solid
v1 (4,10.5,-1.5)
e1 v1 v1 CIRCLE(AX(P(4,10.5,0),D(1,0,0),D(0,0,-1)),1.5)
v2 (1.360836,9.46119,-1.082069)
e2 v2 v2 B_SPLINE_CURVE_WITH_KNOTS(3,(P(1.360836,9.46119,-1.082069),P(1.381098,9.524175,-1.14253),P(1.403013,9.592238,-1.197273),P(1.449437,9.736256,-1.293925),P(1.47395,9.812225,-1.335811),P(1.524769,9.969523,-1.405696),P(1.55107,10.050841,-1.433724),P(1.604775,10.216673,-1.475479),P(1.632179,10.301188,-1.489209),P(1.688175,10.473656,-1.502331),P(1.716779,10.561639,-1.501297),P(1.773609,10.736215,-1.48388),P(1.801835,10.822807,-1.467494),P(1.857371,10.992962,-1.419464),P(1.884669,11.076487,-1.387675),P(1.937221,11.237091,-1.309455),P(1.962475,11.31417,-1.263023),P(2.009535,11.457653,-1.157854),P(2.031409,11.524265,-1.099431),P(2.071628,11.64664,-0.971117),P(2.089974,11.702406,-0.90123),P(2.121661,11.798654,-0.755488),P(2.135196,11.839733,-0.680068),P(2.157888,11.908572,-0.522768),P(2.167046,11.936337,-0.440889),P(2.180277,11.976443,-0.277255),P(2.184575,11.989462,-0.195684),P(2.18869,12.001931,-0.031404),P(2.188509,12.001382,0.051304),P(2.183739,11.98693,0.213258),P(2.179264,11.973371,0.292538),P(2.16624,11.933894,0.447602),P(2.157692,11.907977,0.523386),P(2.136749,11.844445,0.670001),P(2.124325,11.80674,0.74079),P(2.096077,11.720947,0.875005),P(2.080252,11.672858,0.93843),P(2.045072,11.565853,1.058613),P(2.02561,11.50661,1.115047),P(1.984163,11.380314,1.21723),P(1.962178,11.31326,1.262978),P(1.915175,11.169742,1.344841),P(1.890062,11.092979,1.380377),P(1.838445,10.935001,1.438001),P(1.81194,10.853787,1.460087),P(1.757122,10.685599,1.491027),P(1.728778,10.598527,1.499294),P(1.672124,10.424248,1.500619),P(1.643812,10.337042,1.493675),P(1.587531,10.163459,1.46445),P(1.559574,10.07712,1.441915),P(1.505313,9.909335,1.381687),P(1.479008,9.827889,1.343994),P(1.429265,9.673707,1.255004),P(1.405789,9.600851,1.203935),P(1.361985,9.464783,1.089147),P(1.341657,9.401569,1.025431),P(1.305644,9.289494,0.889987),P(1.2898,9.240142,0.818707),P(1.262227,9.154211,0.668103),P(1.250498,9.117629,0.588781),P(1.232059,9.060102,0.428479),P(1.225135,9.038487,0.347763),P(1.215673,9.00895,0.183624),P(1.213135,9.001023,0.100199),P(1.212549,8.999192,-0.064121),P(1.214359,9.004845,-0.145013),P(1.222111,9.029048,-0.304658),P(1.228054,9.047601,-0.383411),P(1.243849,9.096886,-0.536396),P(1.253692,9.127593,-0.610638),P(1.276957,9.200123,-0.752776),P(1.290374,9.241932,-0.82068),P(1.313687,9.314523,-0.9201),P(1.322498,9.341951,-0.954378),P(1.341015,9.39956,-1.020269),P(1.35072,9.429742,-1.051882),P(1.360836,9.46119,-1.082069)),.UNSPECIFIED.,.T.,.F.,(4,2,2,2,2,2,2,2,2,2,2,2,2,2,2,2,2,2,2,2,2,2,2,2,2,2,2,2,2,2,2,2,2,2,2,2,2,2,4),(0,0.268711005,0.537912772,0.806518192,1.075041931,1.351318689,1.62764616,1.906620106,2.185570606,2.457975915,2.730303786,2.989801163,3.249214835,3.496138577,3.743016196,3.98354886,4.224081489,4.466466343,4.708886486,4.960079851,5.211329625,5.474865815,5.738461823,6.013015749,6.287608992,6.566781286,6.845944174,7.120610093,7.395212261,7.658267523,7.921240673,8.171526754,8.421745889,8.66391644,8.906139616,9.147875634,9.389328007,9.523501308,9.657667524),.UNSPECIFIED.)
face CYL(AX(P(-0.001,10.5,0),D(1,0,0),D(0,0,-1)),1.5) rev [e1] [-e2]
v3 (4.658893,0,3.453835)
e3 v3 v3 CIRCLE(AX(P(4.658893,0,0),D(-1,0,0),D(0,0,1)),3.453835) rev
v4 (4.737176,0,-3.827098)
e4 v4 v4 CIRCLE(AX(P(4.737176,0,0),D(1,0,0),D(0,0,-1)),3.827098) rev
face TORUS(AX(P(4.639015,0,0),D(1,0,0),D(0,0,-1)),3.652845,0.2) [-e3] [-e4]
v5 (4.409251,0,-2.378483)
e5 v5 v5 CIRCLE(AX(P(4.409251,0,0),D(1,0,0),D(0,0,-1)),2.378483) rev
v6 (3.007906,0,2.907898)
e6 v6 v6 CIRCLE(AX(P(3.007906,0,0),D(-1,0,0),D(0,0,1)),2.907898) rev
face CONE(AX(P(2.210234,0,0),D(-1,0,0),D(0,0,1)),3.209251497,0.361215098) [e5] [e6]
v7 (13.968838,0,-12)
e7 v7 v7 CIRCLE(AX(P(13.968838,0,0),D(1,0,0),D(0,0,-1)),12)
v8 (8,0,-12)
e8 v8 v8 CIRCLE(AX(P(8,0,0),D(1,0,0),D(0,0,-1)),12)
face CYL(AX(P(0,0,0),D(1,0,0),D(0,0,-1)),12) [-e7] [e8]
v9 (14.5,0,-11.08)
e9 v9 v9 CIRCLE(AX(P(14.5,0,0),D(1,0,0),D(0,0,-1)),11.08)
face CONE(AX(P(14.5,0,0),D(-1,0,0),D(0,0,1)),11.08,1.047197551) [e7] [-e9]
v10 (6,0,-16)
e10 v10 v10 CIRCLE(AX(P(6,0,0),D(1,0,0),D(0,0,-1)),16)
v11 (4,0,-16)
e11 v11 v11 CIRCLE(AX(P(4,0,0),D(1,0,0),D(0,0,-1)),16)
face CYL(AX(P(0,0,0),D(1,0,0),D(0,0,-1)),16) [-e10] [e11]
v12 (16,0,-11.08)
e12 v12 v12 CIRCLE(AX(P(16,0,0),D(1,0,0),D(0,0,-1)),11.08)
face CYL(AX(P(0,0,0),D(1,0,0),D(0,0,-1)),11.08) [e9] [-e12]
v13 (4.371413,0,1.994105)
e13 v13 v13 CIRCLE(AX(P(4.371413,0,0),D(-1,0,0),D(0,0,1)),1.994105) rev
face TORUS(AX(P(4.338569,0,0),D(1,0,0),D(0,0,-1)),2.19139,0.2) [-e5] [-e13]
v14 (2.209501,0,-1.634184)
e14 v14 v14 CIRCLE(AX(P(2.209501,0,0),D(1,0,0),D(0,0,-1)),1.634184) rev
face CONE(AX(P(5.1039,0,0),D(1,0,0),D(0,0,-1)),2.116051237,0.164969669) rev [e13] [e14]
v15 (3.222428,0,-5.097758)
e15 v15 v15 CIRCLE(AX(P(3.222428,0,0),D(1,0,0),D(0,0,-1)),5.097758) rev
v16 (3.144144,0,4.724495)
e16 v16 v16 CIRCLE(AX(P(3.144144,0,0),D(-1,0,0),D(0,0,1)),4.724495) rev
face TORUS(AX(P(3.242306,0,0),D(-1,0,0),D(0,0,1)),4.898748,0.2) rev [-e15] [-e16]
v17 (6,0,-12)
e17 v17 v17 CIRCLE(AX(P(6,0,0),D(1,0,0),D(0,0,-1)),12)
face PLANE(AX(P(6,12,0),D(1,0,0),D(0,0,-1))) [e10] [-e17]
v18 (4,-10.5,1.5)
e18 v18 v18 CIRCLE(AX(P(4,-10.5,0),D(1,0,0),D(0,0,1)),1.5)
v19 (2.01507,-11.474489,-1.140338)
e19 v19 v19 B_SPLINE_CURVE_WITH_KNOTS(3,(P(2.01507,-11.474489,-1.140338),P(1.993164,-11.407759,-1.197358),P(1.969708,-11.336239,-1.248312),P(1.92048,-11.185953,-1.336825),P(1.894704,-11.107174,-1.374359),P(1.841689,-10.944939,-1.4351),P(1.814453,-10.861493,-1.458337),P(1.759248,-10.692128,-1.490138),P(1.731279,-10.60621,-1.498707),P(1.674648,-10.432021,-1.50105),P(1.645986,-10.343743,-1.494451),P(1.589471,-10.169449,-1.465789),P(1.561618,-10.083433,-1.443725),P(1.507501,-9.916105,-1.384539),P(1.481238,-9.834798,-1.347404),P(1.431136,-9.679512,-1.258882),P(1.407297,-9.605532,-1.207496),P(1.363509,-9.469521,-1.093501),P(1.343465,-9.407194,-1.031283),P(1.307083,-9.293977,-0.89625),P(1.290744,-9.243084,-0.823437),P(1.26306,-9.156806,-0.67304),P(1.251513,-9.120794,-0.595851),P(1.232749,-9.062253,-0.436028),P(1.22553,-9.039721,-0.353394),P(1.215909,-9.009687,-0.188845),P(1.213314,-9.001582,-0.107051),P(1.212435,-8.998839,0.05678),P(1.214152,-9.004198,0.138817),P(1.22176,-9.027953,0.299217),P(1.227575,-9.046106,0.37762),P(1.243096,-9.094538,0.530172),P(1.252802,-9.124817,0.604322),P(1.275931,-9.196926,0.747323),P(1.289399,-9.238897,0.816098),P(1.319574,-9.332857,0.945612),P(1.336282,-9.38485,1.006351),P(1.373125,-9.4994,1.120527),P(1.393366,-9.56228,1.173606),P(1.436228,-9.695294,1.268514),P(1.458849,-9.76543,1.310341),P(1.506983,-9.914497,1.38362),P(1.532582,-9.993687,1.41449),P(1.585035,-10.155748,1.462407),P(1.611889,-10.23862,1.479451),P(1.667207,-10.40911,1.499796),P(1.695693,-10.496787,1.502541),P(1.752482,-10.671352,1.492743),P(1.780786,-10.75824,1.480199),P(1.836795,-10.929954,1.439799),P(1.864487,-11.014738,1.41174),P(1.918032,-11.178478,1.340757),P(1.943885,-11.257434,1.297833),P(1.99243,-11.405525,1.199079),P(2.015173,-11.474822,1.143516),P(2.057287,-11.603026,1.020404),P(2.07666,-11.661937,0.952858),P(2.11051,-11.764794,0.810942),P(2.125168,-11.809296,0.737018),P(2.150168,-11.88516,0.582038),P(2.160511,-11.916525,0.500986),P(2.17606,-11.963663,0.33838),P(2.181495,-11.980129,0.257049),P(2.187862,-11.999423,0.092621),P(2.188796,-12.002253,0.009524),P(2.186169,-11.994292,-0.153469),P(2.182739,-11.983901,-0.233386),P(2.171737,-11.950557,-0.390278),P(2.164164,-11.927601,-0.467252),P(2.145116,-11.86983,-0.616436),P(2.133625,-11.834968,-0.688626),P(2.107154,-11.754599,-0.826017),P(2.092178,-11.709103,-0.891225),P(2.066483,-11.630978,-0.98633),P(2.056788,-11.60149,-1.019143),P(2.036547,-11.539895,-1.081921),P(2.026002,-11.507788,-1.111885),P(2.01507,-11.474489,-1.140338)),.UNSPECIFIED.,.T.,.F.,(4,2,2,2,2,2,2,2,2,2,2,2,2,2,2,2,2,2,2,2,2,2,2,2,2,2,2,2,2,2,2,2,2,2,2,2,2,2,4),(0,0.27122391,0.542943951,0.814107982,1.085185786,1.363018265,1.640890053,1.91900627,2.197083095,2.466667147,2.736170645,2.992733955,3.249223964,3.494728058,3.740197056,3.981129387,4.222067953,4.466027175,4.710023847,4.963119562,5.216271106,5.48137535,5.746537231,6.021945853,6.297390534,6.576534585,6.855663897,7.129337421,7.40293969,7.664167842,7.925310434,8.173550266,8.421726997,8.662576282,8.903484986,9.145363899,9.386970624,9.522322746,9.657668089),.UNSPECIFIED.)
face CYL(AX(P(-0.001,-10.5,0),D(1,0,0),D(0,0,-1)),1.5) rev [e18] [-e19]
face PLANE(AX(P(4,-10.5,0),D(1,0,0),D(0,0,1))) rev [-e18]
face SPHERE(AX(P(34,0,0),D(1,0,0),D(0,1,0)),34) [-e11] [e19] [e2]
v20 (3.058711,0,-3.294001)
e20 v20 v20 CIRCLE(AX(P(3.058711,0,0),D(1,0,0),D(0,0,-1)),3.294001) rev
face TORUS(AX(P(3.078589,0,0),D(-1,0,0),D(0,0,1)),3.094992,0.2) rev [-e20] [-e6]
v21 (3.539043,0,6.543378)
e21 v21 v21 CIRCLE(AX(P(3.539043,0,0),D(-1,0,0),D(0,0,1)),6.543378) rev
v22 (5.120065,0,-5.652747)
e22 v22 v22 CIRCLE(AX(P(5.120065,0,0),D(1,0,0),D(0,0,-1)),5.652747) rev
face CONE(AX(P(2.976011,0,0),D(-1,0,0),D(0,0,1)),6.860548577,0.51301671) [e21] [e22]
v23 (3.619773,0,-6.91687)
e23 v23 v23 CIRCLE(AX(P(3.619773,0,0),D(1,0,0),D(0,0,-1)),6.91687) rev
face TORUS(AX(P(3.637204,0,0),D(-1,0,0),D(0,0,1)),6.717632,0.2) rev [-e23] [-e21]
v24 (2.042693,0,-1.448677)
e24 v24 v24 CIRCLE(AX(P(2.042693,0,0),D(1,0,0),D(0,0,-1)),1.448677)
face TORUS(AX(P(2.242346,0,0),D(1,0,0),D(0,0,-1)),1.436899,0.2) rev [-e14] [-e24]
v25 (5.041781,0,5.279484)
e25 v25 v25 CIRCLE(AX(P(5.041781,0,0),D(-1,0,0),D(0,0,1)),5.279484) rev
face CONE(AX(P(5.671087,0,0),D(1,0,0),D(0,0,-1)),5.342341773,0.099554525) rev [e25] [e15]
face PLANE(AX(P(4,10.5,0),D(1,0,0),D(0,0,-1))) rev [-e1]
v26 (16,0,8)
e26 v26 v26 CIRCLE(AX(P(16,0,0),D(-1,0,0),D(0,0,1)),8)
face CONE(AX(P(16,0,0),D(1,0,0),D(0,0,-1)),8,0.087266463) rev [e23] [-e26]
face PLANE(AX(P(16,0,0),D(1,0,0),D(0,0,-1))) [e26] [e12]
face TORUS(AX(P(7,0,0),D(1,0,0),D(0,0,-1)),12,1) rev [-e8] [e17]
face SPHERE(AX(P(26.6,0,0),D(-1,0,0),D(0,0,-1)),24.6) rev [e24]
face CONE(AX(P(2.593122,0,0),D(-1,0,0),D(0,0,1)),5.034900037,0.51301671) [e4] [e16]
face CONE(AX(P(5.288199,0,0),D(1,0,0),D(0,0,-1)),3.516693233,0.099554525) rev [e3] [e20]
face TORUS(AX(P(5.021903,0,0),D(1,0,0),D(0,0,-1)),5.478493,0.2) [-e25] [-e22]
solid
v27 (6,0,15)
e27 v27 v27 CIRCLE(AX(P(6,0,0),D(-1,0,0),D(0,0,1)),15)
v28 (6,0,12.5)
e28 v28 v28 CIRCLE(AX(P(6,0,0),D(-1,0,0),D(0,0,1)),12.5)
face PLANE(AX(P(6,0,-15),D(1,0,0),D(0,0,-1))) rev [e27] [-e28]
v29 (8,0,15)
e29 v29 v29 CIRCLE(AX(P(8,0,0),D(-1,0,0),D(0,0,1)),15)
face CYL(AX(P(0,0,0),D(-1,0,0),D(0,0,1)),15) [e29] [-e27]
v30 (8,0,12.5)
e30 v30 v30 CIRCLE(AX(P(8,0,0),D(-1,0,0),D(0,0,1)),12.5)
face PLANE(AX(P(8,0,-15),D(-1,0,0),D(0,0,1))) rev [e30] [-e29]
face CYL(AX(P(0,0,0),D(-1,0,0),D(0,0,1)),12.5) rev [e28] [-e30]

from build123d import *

# Parameters (mm, degrees)
ZAOBLIT1_R                    = 0.2
SKICA3_W                      = 2
SKICA3_H                      = 2.5
ODEBRAT_VYSUNUT_M1_REACH      = 27.612
ODEBRAT_VYSUNUT_M1_END_RADIUS = 34
SKICA4_R                      = 1.5
KRUHOV_START                  = 1.212807508
KRUHOV_POLE1_OUTLINE_R        = 1.5
KRUHOV_POLE1_DEPTH            = 2.787192492


# Read off the part's stored shape, not the designer's step: Kruhové pole1
with BuildPart() as part:
    # Skica1 → Otočit kolem osy1 (revolve)
    with BuildSketch(Plane.XY, mode=Mode.PRIVATE) as oto_it_kolem_osy1_sk:
        with BuildLine():
            Line((0, 0), (16, 0))
            Line((16, 0), (16, 11.08))
            Line((16, 11.08), (14.5, 11.08))
            Line((14.5, 11.08), (13.968837752, 12))
            Line((13.968837752, 12), (8, 12))
            ThreePointArc((8, 12), (7, 11), (6, 12))
            Line((6, 12), (6, 16))
            Line((6, 16), (4, 16))
            ThreePointArc((4, 16), (1.015154995, 8.246211251), (0, 0))
        make_face()
    revolve(oto_it_kolem_osy1_sk.sketch.rotate(Axis((0, 0, 0), (-1, 0, 0)), 90), axis=Axis((0, 0, 0), (-1, 0, 0)))

    # Skica2 → Odebrat otočením2 (revolve, cut)
    with BuildSketch(Plane(origin=(0, 0, 0), x_dir=(1, 0, 0), z_dir=(0, 1, 0)), mode=Mode.PRIVATE) as odebrat_oto_en_m2_sk:
        with BuildLine():
            Line((16, 8), (2.976010641, 6.860548577))
            Line((2.976010641, 6.860548577), (5.671087358, 5.342341773))
            Line((5.671087358, 5.342341773), (2.593122123, 5.034900037))
            Line((2.593122123, 5.034900037), (5.288198839, 3.516693233))
            Line((5.288198839, 3.516693233), (2.210233604, 3.209251497))
            Line((2.210233604, 3.209251497), (5.103899722, 2.116051237))
            Line((5.103899722, 2.116051237), (2.052614667, 1.60806509))
            ThreePointArc((2.052614667, 1.60806509), (2.013157185, 0.804462808), (2, 0))
            Line((2, 0), (16, 0))
            Line((16, 0), (16, 8))
        make_face()
    revolve(odebrat_oto_en_m2_sk.sketch.rotate(Axis((0, 0, 0), (1, 0, 0)), 180), axis=Axis((0, 0, 0), (1, 0, 0)), mode=Mode.SUBTRACT)

    # Zaoblit1
    zaoblit1_edges = [part.edges().sort_by_distance(p)[0] for p in [
        (2.976010641, 0, -6.860548577),
        (5.671087358, 0, -5.342341773),
        (2.593122123, 0, -5.034900037),
        (5.288198839, 0, -3.516693233),
        (2.210233604, 0, -3.209251497),
        (5.103899722, 0, -2.116051237),
        (2.052614667, 0, -1.60806509),
    ]]
    fillet(zaoblit1_edges, radius=ZAOBLIT1_R)

    # Odebrat vysunutím1: up to this sphere (the profile starts inside it)
    odebrat_vysunut_m1_end = Location((34, 0, 0)) * Sphere(ODEBRAT_VYSUNUT_M1_END_RADIUS, mode=Mode.PRIVATE)
    # Skica4 → Odebrat vysunutím1 (cut, up to the surface)
    with BuildSketch(Plane(origin=(4, 0, 0), x_dir=(0, 0, -1), z_dir=(1, 0, 0)), mode=Mode.PRIVATE) as odebrat_vysunut_m1_sk1:
        with Locations((0, 10.5)):
            Circle(SKICA4_R)
    odebrat_vysunut_m1_tool1 = extrude(odebrat_vysunut_m1_sk1.sketch, amount=-ODEBRAT_VYSUNUT_M1_REACH, mode=Mode.PRIVATE) & odebrat_vysunut_m1_end
    add(odebrat_vysunut_m1_tool1.solids().sort_by_distance((4, 10.5, 0))[0], mode=Mode.SUBTRACT)

    # Kruhové pole1 outline → Kruhové pole1 (cut)
    with BuildSketch(Plane.YZ.offset(KRUHOV_START)):
        with Locations((-10.5, 0)):
            Circle(KRUHOV_POLE1_OUTLINE_R)
    extrude(amount=KRUHOV_POLE1_DEPTH, mode=Mode.SUBTRACT)


with BuildPart() as body_2:
    # Skica3 → Otočit kolem osy2 (revolve)
    with BuildSketch(Plane(origin=(0, 0, 0), x_dir=(1, 0, 0), z_dir=(0, 1, 0))):
        with Locations((7, 13.75)):
            Rectangle(SKICA3_W, SKICA3_H)
    revolve(axis=Axis((0, 0, 0), (1, 0, 0)))


solid = Compound([part.part, body_2.part])
